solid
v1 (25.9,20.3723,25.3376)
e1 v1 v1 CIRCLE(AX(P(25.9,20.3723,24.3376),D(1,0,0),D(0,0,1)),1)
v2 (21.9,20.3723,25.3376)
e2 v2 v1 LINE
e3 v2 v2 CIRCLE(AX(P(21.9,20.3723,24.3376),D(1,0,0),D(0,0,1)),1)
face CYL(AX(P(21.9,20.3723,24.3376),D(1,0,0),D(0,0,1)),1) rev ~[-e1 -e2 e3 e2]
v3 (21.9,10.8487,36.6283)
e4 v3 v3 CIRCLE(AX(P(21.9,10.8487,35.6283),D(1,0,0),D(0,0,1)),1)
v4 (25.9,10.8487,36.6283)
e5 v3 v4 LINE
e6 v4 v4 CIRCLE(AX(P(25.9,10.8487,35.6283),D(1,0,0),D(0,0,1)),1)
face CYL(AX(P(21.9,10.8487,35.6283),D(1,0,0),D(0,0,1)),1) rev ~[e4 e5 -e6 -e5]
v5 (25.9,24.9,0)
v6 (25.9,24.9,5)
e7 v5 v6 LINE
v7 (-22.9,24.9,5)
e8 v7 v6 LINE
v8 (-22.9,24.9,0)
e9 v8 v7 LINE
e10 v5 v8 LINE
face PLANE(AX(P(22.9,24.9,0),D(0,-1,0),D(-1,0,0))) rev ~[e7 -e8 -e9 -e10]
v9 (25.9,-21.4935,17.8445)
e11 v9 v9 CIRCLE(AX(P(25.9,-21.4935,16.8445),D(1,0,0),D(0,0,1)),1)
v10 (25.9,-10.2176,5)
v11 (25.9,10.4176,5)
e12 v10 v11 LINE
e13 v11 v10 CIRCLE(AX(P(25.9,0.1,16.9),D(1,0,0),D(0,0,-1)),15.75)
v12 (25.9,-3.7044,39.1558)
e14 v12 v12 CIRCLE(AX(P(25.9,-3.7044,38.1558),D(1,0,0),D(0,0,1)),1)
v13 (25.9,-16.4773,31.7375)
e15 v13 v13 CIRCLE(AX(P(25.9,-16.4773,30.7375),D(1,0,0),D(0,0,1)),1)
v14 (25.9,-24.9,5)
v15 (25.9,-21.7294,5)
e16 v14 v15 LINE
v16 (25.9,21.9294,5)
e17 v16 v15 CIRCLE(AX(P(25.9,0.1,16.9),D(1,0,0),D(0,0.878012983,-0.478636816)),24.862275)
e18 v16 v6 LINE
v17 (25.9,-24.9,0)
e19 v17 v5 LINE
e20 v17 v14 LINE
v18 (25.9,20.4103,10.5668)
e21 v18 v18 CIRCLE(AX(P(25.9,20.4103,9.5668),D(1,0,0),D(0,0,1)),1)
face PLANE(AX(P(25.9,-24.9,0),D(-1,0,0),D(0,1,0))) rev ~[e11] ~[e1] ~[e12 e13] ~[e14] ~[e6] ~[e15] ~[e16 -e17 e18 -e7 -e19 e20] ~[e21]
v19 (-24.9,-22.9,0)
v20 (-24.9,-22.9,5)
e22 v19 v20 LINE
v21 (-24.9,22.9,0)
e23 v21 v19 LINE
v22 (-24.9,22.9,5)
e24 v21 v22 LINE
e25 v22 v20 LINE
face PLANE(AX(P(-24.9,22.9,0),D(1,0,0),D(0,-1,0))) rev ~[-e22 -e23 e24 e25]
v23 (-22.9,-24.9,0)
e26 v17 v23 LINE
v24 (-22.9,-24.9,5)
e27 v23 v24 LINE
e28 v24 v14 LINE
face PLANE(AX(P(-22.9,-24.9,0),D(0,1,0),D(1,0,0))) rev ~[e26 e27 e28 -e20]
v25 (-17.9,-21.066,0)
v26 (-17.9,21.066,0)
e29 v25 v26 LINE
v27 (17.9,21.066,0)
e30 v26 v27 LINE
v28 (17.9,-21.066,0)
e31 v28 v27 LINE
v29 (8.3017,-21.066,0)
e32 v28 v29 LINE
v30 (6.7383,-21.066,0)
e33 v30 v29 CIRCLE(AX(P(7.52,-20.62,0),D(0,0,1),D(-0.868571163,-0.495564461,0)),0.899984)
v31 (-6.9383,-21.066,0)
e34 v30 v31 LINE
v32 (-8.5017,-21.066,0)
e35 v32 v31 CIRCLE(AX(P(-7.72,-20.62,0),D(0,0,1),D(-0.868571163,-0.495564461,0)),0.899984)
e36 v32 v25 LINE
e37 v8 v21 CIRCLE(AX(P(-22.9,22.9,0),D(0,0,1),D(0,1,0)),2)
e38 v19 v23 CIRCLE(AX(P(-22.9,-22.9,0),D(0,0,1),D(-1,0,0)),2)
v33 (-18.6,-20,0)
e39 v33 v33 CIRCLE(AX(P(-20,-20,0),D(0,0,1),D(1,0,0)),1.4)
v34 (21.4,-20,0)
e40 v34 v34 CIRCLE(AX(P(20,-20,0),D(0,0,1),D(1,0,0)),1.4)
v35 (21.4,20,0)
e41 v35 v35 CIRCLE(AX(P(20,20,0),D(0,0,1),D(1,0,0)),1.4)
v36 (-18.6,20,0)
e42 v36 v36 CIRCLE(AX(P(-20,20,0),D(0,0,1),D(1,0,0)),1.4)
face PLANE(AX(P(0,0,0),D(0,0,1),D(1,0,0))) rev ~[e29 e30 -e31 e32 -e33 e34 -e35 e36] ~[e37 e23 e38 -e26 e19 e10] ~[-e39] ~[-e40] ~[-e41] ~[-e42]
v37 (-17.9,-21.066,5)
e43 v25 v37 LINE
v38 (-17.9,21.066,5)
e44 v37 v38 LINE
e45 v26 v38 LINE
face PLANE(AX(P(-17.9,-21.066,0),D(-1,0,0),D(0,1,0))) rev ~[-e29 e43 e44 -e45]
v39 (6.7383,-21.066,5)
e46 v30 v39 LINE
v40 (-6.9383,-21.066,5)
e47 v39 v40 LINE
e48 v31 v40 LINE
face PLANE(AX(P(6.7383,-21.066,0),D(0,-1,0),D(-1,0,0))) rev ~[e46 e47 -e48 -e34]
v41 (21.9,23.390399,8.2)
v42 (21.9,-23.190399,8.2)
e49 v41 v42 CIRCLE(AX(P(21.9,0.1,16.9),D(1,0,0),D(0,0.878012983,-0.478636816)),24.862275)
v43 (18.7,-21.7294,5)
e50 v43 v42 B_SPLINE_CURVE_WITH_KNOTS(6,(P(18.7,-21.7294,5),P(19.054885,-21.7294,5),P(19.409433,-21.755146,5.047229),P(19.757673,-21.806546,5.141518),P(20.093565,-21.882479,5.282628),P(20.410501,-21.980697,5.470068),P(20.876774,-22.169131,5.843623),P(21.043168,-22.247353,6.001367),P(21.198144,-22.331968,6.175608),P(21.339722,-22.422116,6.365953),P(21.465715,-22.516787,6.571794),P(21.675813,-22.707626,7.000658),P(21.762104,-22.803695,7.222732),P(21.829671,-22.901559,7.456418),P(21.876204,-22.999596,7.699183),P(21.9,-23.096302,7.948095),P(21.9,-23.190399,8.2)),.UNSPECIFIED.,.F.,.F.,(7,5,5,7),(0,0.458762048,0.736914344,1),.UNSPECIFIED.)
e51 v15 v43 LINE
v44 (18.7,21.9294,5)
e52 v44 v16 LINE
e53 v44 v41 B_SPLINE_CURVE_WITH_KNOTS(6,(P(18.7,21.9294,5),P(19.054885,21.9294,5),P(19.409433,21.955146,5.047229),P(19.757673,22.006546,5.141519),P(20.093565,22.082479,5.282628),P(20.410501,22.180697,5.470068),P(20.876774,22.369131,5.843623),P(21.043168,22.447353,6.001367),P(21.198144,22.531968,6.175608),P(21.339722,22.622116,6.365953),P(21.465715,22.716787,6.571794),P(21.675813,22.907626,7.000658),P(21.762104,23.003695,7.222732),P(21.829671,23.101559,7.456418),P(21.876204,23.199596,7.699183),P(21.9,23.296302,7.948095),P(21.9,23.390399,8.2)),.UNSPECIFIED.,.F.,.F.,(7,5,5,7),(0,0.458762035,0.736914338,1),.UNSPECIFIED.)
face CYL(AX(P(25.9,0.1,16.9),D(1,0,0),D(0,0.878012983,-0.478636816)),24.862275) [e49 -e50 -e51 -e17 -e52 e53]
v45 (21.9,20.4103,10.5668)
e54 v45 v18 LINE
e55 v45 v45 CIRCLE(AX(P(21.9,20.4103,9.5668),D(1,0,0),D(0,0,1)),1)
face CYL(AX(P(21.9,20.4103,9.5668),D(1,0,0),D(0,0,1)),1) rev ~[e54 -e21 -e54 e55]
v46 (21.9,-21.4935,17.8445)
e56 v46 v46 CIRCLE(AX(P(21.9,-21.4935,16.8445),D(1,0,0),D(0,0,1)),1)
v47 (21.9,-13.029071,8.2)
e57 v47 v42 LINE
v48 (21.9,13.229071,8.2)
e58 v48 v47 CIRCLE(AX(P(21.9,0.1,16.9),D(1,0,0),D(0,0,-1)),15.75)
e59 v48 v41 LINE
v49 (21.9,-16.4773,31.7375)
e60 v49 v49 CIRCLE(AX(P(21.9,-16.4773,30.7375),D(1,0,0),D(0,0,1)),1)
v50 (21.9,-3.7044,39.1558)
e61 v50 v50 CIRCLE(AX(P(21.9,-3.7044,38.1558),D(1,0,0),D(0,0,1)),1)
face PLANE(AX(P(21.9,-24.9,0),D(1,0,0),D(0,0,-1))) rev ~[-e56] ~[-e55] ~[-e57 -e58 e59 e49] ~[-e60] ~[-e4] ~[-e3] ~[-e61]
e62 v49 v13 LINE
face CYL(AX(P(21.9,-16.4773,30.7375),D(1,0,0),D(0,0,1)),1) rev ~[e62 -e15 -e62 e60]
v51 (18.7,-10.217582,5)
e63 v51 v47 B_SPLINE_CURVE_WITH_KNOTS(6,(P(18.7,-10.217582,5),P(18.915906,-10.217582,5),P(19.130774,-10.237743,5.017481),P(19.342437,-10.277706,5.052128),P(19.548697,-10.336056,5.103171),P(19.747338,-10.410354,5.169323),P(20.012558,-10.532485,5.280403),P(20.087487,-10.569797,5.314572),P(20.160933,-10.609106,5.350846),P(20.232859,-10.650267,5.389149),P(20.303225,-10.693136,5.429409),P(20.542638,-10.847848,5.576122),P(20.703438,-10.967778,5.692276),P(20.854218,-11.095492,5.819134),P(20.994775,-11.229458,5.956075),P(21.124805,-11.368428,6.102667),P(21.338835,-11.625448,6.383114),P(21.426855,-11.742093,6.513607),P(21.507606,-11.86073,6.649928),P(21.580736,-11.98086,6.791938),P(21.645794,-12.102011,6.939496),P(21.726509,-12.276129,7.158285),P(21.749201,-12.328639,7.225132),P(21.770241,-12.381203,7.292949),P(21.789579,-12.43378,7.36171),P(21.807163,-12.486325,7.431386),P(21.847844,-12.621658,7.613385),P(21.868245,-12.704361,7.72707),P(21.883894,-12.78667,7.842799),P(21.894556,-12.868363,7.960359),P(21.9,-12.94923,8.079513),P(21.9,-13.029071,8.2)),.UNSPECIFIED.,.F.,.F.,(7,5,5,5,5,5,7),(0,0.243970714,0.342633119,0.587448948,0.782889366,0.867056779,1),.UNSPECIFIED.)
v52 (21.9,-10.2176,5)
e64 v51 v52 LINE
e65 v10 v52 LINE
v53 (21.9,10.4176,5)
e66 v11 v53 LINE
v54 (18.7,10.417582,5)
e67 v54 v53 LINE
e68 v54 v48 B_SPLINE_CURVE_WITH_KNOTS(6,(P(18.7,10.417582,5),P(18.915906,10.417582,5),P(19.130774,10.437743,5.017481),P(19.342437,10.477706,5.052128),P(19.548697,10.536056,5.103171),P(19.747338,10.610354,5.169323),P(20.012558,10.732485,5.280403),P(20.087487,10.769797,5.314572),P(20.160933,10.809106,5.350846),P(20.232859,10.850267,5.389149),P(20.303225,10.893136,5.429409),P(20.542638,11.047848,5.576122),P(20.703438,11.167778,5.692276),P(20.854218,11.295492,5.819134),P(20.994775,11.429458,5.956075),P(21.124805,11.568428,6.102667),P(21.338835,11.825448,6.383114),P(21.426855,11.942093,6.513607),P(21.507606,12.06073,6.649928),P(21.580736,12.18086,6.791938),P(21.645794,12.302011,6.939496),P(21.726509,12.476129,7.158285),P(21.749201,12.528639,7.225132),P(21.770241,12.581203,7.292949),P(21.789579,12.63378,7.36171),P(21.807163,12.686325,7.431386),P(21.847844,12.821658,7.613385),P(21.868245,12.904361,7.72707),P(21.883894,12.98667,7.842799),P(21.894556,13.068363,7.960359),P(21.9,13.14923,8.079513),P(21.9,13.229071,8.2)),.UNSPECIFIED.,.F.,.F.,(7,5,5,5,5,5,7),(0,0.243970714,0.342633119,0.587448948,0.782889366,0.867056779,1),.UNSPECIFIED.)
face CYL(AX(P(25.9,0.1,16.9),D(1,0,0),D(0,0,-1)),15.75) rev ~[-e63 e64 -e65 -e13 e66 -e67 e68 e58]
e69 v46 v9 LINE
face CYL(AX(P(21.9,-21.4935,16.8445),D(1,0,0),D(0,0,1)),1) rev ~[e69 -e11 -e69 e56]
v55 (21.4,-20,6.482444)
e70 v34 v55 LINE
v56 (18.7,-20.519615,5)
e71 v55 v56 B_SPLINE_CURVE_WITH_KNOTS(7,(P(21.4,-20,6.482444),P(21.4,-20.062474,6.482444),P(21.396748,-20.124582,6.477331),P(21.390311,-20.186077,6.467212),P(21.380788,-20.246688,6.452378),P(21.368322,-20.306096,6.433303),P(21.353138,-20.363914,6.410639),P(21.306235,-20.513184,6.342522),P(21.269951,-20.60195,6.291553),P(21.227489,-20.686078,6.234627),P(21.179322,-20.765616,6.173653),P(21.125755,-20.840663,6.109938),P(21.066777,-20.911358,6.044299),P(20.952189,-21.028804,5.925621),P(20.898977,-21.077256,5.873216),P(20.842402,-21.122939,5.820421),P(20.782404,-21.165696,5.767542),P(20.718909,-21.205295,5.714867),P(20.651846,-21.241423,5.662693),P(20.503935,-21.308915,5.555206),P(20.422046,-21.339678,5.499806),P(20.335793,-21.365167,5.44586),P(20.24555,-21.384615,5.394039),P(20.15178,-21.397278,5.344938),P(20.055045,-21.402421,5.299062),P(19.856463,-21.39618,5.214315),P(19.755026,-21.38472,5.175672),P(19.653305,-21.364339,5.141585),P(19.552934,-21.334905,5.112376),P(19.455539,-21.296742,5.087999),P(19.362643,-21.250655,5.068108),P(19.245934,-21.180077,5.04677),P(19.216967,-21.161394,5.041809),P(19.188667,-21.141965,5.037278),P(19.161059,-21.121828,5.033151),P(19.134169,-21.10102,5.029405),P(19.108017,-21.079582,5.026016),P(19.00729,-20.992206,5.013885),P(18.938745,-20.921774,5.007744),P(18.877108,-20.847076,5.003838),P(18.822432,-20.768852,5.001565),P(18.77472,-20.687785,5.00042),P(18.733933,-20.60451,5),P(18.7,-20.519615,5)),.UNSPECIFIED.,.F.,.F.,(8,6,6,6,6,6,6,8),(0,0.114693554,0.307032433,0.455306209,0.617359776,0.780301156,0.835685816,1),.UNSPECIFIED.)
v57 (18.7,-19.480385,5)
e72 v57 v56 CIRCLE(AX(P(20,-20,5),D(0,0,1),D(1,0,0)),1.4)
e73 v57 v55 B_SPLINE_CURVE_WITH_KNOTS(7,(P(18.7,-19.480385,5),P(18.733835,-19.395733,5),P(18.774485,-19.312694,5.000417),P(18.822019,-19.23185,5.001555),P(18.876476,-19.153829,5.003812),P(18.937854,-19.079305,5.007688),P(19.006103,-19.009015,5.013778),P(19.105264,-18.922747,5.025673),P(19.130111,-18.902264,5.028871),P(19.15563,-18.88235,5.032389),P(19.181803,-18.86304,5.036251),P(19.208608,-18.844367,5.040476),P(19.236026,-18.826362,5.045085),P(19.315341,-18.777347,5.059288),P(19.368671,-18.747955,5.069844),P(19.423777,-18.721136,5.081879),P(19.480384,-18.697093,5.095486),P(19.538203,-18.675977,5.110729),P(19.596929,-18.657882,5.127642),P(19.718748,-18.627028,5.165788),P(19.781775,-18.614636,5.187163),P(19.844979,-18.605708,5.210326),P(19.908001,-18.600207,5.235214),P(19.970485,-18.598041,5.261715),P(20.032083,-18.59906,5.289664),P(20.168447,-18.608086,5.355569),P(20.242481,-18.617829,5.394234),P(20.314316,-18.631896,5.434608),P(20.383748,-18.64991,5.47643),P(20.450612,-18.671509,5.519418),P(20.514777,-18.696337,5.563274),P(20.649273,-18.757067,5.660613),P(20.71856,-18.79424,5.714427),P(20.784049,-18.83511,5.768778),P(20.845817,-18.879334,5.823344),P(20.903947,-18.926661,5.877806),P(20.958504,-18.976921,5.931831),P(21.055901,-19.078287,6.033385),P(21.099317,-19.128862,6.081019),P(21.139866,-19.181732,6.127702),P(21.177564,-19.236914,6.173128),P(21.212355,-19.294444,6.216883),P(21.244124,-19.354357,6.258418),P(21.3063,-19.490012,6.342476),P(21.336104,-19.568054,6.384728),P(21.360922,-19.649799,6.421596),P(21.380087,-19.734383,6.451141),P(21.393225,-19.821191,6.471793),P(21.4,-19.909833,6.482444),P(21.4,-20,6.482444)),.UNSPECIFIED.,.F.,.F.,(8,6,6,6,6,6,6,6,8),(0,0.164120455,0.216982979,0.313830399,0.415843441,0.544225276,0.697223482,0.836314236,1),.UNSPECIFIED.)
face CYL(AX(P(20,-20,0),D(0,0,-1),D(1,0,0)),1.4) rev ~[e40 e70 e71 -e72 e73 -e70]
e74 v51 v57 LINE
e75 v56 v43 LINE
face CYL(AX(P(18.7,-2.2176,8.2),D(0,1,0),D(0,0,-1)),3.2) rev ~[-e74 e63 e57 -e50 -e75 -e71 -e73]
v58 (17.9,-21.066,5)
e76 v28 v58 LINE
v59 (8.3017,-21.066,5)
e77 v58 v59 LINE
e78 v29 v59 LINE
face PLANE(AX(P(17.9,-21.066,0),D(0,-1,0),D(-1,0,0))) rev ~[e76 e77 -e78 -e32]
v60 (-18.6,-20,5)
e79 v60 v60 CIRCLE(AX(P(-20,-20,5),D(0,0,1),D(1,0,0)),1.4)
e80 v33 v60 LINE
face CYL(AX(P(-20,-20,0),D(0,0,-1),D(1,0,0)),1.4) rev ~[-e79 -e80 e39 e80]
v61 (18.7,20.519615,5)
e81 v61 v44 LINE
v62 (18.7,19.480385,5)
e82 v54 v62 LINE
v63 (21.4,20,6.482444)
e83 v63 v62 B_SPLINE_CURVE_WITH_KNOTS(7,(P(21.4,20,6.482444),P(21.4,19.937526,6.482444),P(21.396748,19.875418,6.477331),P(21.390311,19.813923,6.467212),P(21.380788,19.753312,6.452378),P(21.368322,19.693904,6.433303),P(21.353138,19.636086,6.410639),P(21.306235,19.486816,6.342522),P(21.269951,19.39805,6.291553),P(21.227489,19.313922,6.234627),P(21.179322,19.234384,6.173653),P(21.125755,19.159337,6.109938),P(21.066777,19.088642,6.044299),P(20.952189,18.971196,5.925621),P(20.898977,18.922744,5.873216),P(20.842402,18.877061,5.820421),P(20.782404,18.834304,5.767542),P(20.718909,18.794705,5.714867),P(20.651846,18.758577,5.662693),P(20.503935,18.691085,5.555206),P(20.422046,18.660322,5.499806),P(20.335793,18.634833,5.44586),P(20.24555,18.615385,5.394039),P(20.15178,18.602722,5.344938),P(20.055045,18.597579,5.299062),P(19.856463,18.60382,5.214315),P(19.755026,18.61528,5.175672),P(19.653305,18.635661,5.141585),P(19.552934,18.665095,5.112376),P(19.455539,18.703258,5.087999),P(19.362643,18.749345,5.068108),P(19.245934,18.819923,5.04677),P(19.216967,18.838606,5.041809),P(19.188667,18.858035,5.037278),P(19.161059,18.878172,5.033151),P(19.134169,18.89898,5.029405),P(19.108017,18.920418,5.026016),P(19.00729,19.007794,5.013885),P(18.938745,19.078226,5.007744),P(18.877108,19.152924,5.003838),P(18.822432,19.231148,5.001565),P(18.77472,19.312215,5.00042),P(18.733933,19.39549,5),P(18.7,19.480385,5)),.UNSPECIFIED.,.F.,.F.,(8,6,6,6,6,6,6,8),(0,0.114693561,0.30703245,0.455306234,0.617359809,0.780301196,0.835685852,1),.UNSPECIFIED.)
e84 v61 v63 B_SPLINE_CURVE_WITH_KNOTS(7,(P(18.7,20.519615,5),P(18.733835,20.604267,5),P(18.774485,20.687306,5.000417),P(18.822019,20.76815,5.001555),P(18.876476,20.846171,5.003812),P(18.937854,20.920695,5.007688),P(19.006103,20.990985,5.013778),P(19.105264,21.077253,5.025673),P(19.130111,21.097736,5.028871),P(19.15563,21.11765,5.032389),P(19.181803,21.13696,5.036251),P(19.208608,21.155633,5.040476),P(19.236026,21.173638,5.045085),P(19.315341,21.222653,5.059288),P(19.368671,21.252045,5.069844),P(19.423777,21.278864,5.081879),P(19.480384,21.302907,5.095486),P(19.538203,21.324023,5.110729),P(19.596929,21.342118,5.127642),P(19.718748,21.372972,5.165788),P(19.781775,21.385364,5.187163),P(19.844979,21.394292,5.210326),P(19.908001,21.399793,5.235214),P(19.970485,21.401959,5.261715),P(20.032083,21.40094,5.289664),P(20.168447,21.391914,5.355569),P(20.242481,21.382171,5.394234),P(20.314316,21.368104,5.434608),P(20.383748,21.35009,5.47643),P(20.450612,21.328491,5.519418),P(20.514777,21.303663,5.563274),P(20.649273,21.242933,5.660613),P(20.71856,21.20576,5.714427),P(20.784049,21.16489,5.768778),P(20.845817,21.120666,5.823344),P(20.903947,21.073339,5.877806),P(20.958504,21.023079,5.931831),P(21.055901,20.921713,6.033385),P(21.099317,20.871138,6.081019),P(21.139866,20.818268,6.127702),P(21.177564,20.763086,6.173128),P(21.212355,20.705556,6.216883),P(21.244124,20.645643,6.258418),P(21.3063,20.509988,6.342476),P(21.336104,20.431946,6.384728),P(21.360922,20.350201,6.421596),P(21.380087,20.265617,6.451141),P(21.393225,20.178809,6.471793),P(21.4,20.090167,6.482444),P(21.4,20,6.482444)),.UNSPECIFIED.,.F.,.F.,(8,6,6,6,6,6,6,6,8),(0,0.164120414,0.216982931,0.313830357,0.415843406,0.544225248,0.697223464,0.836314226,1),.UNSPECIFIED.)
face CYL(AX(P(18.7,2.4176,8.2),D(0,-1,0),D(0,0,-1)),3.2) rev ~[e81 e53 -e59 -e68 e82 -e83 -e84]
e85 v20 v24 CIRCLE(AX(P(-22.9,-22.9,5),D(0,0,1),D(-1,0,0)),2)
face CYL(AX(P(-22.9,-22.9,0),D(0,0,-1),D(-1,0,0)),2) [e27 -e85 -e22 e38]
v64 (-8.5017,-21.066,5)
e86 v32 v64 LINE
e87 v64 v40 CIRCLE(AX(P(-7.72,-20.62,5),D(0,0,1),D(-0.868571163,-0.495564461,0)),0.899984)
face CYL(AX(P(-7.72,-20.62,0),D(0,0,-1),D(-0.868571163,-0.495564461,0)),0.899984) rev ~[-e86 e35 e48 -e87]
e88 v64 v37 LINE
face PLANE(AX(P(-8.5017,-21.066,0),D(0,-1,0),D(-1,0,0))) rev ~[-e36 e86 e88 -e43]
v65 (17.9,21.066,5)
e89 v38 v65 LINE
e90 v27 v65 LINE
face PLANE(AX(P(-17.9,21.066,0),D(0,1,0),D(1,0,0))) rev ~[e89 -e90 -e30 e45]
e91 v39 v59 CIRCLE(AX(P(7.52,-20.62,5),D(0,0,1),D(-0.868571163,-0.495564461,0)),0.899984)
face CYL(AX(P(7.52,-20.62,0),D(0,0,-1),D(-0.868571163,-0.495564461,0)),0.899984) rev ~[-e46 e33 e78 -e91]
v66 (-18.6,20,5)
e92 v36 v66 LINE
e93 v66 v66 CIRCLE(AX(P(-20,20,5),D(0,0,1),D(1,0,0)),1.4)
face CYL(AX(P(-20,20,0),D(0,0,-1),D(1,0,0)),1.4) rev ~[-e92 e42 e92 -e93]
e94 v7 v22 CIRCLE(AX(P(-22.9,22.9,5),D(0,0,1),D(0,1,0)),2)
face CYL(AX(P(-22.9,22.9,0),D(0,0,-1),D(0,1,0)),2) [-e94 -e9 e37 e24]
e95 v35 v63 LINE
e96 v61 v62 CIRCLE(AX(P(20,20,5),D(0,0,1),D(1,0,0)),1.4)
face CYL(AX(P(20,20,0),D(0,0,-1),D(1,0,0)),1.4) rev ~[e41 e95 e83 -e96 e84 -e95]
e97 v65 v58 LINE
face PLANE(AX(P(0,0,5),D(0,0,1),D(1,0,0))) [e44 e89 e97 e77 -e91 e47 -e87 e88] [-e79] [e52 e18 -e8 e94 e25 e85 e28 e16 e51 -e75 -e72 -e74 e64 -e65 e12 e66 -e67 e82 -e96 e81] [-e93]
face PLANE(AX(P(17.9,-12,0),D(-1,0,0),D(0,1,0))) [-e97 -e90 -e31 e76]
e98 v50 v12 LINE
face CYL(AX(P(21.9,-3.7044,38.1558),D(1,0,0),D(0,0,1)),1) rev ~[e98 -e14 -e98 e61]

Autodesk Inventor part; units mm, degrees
ref_plane "YZ Plane" through (0, 0, 0) normal (1, 0, 0) x (0, 1, 0)
ref_plane "XZ Plane" through (0, 0, 0) normal (0, 1, 0) x (-1, 0, 0)
ref_plane "XY Plane" through (0, 0, 0) normal (0, 0, 1) x (1, 0, 0)
ref_plane "Arbeitsebene1" through (0, 0, 0) normal (0, 0, 1) x (1, 0, 0)
sketch "Skizze1" plane through (0, 0, 0) normal (0, 0, 1) x (1, 0, 0)
  arc A0 (13.4381, 5.6873) -> (13.3881, 5.2) centre (15.7881, 5.2) ccw construction
  line L0 (13.4381, 5.6873) -> (13.4381, 7.6) construction
  line L1 (13.4381, 7.6) -> (15.7881, 7.6) construction
  arc A1 (18.1881, 5.2) -> (15.7881, 7.6) centre (15.7881, 5.2) ccw projected
  line L2 (18.1881, 5.2) -> (18.1881, -5.2) construction
  arc A2 (15.7881, -7.6) -> (18.1881, -5.2) centre (15.7881, -5.2) ccw projected
  line L3 (15.7881, -7.6) -> (13.4381, -7.6) construction
  line L4 (13.4381, -7.6) -> (13.4381, -5.6873) construction
  arc A3 (13.3881, -5.2) -> (13.4381, -5.6873) centre (15.7881, -5.2) ccw construction
  line L5 (13.3881, -5.2) -> (13.3881, 5.2) construction
  arc A4 (14.5, 9) -> (11.5, 6) centre (14.5, 6) ccw construction
  line L6 (11.5, -6) -> (11.5, 6) construction
  arc A5 (11.5, -6) -> (14.5, -9) centre (14.5, -6) ccw construction
  line L7 (14.9, -9) -> (14.5, -9) construction
  arc A6 (17.9, -12) -> (14.9, -9) centre (14.9, -12) ccw projected
  line L8 (17.9, -12) -> (17.9, -21.066) projected
  line L9 (6.7383, -21.066) -> (-6.9383, -21.066) projected
  line L10 (-17.9, -21.066) -> (-17.9, 21.066) projected
  line L11 (-17.9, 21.066) -> (17.9, 21.066) projected
  line L12 (17.9, 21.066) -> (17.9, 12) projected
  arc A7 (14.9, 9) -> (17.9, 12) centre (14.9, 12) ccw projected
  line L13 (14.5, 9) -> (14.9, 9) construction
  circle A8 centre (-20, 20) radius 1.6 construction
  circle A9 centre (20, -20) radius 1.6 construction
  circle A10 centre (-20, -20) radius 1.6 construction
  circle A11 centre (20, 20) radius 1.6 construction
  arc A12 (-22.9, 24.9) -> (-24.9, 22.9) centre (-22.9, 22.9) ccw projected
  line L14 (-24.9, 22.9) -> (-24.9, -22.9) projected
  arc A13 (-24.9, -22.9) -> (-22.9, -24.9) centre (-22.9, -22.9) ccw projected
  line L15 (-22.9, -24.9) -> (22.9, -24.9) projected
  arc A14 (22.9, -24.9) -> (24.9, -22.9) centre (22.9, -22.9) ccw projected
  line L16 (24.9, -22.9) -> (24.9, 22.9) projected
  arc A15 (24.9, 22.9) -> (22.9, 24.9) centre (22.9, 22.9) ccw projected
  line L17 (22.9, 24.9) -> (-22.9, 24.9) projected
  arc A16 (6.7383, -21.066) -> (8.3017, -21.066) centre (7.52, -20.62) ccw projected
  arc A17 (-8.5017, -21.066) -> (-6.9383, -21.066) centre (-7.72, -20.62) ccw projected
  line L18 (-8.5017, -21.066) -> (-17.9, -21.066) projected
  line L19 (17.9, -21.066) -> (8.3017, -21.066) projected
  line L20 (17.9, -12) -> (17.9, 12)
  circle A18 centre (-20, 20) radius 1.4
  line L21 (-20, 20) -> (20, 20) construction
  line L22 (20, 20) -> (20, -20) construction
  line L23 (20, -20) -> (-20, -20) construction
  line L24 (-20, -20) -> (-20, 20) construction
  circle A19 centre (20, -20) radius 1.4
  circle A20 centre (20, 20) radius 1.4
  circle A21 centre (-20, -20) radius 1.4
  line L25 (25.9, -32.5) -> (25.9, 32.5) projected
  line L26 (22.9, -24.9) -> (25.9, -24.9)
  line L27 (22.9, 24.9) -> (25.9, 24.9)
  point P0 (0, 0)
  dimension "d7" = 2.8
  dimension "d8" = 40
  dimension "d9" = 40
  dimension "d10" = 2.8
  dimension "d11" = 2.8
  dimension "d12" = 2.8
extrude "Extrusion1" add sketch "Skizze1" along normal blind 5
sketch "Sketch6" plane through (25.9, -24.9, 0) normal (1, 0, 0) x (0, 0, -1)
  circle A0 centre (-16.9, 25) radius 22.5 projected
  circle A1 centre (-16.9, 25) radius 15.75 projected
  line L0 (-5, 0) -> (-5, 49.8) projected
  line L1 (-5, 14.6824) -> (-5, 5.9045)
  line L2 (-5, 44.0955) -> (-5, 35.3176)
  arc A2 (-5, 46.8294) -> (-5, 3.1706) centre (-16.9, 25) ccw
  line L3 (-5, 46.8294) -> (-5, 35.3176)
  line L4 (-5, 14.6824) -> (-5, 3.1706)
  point P0 (0, 24.9)
extrude "Extrusion3" add sketch "Sketch6" against normal blind 4 contours L0 A1 A0 | A0 L0 A2 picked at (-36.9413, 23.2431)
sketch "Sketch7" plane through (21.9, -24.9, 0) normal (-1, 0, 0) x (0, 0, 1)
  circle A0 centre (2.9774, 8.4941) radius 0.25 projected
  circle A1 centre (16.8445, 3.4065) radius 0.25 projected
  circle A2 centre (30.7375, 8.4227) radius 0.25 projected
  circle A3 centre (38.1558, 21.1956) radius 0.25 projected
  circle A4 centre (35.6283, 35.7487) radius 0.25 projected
  circle A5 centre (24.3376, 45.2723) radius 0.25 projected
  circle A6 centre (9.5668, 45.3103) radius 0.25 projected
  circle A7 centre (-1.7728, 35.8449) radius 0.25 projected
  circle A8 centre (-4.3751, 21.305) radius 0.25 projected
  line L0 (-2.665, 15.2234) -> (2.0334, 16.9335) projected
  line L1 (2.0334, 16.9335) -> (0.3233, 21.632) projected
  line L2 (0.3233, 21.632) -> (-4.3751, 19.9219) projected
  line L3 (-4.3751, 19.9219) -> (-2.665, 15.2234) projected
  line L4 (1.8587, 9.1214) -> (5.6889, 12.3353) projected
  line L5 (5.6889, 12.3353) -> (2.4749, 16.1656) projected
  line L6 (2.4749, 16.1656) -> (-1.3553, 12.9516) projected
  line L7 (-1.3553, 12.9516) -> (1.8587, 9.1214) projected
  line L8 (8.1966, 4.9346) -> (10.6966, 9.2647) projected
  line L9 (10.6966, 9.2647) -> (6.3664, 11.7647) projected
  line L10 (6.3664, 11.7647) -> (3.8664, 7.4346) projected
  line L11 (3.8664, 7.4346) -> (8.1966, 4.9346) projected
  line L12 (15.5842, 3.1679) -> (16.4525, 8.0919) projected
  line L13 (16.4525, 8.0919) -> (11.5284, 8.9602) projected
  line L14 (11.5284, 8.9602) -> (10.6602, 4.0361) projected
  line L15 (10.6602, 4.0361) -> (15.5842, 3.1679) projected
  line L16 (23.1306, 4.0345) -> (22.2623, 8.9586) projected
  line L17 (22.2623, 8.9586) -> (17.3383, 8.0903) projected
  line L18 (17.3383, 8.0903) -> (18.2066, 3.1663) projected
  line L19 (18.2066, 3.1663) -> (23.1306, 4.0345) projected
  line L20 (29.9255, 7.4299) -> (27.4255, 11.76) projected
  line L21 (27.4255, 11.76) -> (23.0953, 9.26) projected
  line L22 (23.0953, 9.26) -> (25.5953, 4.9299) projected
  line L23 (25.5953, 4.9299) -> (29.9255, 7.4299) projected
  line L24 (35.1493, 12.9445) -> (31.319, 16.1584) projected
  line L25 (31.319, 16.1584) -> (28.1051, 12.3282) projected
  line L26 (28.1051, 12.3282) -> (31.9353, 9.1142) projected
  line L27 (31.9353, 9.1142) -> (35.1493, 12.9445) projected
  line L28 (38.1719, 19.9131) -> (33.4735, 21.6232) projected
  line L29 (33.4735, 21.6232) -> (31.7634, 16.9247) projected
  line L30 (31.7634, 16.9247) -> (36.4618, 15.2146) projected
  line L31 (36.4618, 15.2146) -> (38.1719, 19.9131) projected
  line L32 (38.6289, 27.4953) -> (33.6289, 27.4953) projected
  line L33 (33.6289, 27.4953) -> (33.6289, 22.4953) projected
  line L34 (33.6289, 22.4953) -> (38.6289, 22.4953) projected
  line L35 (38.6289, 22.4953) -> (38.6289, 27.4953) projected
  line L36 (36.465, 34.7766) -> (31.7666, 33.0665) projected
  line L37 (31.7666, 33.0665) -> (33.4767, 28.368) projected
  line L38 (33.4767, 28.368) -> (38.1751, 30.0781) projected
  line L39 (38.1751, 30.0781) -> (36.465, 34.7766) projected
  line L40 (31.9413, 40.8786) -> (28.1111, 37.6647) projected
  line L41 (28.1111, 37.6647) -> (31.3251, 33.8344) projected
  line L42 (31.3251, 33.8344) -> (35.1553, 37.0484) projected
  line L43 (35.1553, 37.0484) -> (31.9413, 40.8786) projected
  line L44 (25.6034, 45.0654) -> (23.1034, 40.7353) projected
  line L45 (23.1034, 40.7353) -> (27.4336, 38.2353) projected
  line L46 (27.4336, 38.2353) -> (29.9336, 42.5654) projected
  line L47 (29.9336, 42.5654) -> (25.6034, 45.0654) projected
  line L48 (18.2158, 46.8321) -> (17.3475, 41.9081) projected
  line L49 (17.3475, 41.9081) -> (22.2716, 41.0398) projected
  line L50 (22.2716, 41.0398) -> (23.1398, 45.9639) projected
  line L51 (23.1398, 45.9639) -> (18.2158, 46.8321) projected
  line L52 (10.6694, 45.9655) -> (11.5377, 41.0414) projected
  line L53 (11.5377, 41.0414) -> (16.4617, 41.9097) projected
  line L54 (16.4617, 41.9097) -> (15.5934, 46.8337) projected
  line L55 (15.5934, 46.8337) -> (10.6694, 45.9655) projected
  line L56 (3.8745, 42.5701) -> (6.3745, 38.24) projected
  line L57 (6.3745, 38.24) -> (10.7047, 40.74) projected
  line L58 (10.7047, 40.74) -> (8.2047, 45.0701) projected
  line L59 (8.2047, 45.0701) -> (3.8745, 42.5701) projected
  line L60 (-1.3493, 37.0555) -> (2.481, 33.8416) projected
  line L61 (2.481, 33.8416) -> (5.6949, 37.6718) projected
  line L62 (5.6949, 37.6718) -> (1.8647, 40.8858) projected
  line L63 (1.8647, 40.8858) -> (-1.3493, 37.0555) projected
  line L64 (-4.3719, 30.0869) -> (0.3265, 28.3768) projected
  line L65 (0.3265, 28.3768) -> (2.0366, 33.0753) projected
  line L66 (2.0366, 33.0753) -> (-2.6618, 34.7854) projected
  line L67 (-2.6618, 34.7854) -> (-4.3719, 30.0869) projected
  line L68 (-4.8289, 22.5047) -> (0.1711, 22.5047) projected
  line L69 (0.1711, 22.5047) -> (0.1711, 27.5047) projected
  line L70 (0.1711, 27.5047) -> (-4.8289, 27.5047) projected
  line L71 (-4.8289, 27.5047) -> (-4.8289, 22.5047) projected
  circle A9 centre (16.9, 25) radius 15.75 projected
  circle A10 centre (16.9, 25) radius 22.5 projected
  point P0 (0, 24.9)
hole "Hole1" at (21.9, 20.4103, 9.5668) at (21.9, 20.3723, 24.3376) at (21.9, 10.8487, 35.6283) at (21.9, -3.7044, 38.1558) at (21.9, -16.4773, 30.7375) at (21.9, -21.4935, 16.8445) direction (1, 0, 0) diameter 2 end through all
fillet "Fillet2" radius 3.2 2 edges at (21.9, 16.1735, 5) (21.9, -15.9735, 5)
properties part number "30_Cube_LED_Array_v0"
